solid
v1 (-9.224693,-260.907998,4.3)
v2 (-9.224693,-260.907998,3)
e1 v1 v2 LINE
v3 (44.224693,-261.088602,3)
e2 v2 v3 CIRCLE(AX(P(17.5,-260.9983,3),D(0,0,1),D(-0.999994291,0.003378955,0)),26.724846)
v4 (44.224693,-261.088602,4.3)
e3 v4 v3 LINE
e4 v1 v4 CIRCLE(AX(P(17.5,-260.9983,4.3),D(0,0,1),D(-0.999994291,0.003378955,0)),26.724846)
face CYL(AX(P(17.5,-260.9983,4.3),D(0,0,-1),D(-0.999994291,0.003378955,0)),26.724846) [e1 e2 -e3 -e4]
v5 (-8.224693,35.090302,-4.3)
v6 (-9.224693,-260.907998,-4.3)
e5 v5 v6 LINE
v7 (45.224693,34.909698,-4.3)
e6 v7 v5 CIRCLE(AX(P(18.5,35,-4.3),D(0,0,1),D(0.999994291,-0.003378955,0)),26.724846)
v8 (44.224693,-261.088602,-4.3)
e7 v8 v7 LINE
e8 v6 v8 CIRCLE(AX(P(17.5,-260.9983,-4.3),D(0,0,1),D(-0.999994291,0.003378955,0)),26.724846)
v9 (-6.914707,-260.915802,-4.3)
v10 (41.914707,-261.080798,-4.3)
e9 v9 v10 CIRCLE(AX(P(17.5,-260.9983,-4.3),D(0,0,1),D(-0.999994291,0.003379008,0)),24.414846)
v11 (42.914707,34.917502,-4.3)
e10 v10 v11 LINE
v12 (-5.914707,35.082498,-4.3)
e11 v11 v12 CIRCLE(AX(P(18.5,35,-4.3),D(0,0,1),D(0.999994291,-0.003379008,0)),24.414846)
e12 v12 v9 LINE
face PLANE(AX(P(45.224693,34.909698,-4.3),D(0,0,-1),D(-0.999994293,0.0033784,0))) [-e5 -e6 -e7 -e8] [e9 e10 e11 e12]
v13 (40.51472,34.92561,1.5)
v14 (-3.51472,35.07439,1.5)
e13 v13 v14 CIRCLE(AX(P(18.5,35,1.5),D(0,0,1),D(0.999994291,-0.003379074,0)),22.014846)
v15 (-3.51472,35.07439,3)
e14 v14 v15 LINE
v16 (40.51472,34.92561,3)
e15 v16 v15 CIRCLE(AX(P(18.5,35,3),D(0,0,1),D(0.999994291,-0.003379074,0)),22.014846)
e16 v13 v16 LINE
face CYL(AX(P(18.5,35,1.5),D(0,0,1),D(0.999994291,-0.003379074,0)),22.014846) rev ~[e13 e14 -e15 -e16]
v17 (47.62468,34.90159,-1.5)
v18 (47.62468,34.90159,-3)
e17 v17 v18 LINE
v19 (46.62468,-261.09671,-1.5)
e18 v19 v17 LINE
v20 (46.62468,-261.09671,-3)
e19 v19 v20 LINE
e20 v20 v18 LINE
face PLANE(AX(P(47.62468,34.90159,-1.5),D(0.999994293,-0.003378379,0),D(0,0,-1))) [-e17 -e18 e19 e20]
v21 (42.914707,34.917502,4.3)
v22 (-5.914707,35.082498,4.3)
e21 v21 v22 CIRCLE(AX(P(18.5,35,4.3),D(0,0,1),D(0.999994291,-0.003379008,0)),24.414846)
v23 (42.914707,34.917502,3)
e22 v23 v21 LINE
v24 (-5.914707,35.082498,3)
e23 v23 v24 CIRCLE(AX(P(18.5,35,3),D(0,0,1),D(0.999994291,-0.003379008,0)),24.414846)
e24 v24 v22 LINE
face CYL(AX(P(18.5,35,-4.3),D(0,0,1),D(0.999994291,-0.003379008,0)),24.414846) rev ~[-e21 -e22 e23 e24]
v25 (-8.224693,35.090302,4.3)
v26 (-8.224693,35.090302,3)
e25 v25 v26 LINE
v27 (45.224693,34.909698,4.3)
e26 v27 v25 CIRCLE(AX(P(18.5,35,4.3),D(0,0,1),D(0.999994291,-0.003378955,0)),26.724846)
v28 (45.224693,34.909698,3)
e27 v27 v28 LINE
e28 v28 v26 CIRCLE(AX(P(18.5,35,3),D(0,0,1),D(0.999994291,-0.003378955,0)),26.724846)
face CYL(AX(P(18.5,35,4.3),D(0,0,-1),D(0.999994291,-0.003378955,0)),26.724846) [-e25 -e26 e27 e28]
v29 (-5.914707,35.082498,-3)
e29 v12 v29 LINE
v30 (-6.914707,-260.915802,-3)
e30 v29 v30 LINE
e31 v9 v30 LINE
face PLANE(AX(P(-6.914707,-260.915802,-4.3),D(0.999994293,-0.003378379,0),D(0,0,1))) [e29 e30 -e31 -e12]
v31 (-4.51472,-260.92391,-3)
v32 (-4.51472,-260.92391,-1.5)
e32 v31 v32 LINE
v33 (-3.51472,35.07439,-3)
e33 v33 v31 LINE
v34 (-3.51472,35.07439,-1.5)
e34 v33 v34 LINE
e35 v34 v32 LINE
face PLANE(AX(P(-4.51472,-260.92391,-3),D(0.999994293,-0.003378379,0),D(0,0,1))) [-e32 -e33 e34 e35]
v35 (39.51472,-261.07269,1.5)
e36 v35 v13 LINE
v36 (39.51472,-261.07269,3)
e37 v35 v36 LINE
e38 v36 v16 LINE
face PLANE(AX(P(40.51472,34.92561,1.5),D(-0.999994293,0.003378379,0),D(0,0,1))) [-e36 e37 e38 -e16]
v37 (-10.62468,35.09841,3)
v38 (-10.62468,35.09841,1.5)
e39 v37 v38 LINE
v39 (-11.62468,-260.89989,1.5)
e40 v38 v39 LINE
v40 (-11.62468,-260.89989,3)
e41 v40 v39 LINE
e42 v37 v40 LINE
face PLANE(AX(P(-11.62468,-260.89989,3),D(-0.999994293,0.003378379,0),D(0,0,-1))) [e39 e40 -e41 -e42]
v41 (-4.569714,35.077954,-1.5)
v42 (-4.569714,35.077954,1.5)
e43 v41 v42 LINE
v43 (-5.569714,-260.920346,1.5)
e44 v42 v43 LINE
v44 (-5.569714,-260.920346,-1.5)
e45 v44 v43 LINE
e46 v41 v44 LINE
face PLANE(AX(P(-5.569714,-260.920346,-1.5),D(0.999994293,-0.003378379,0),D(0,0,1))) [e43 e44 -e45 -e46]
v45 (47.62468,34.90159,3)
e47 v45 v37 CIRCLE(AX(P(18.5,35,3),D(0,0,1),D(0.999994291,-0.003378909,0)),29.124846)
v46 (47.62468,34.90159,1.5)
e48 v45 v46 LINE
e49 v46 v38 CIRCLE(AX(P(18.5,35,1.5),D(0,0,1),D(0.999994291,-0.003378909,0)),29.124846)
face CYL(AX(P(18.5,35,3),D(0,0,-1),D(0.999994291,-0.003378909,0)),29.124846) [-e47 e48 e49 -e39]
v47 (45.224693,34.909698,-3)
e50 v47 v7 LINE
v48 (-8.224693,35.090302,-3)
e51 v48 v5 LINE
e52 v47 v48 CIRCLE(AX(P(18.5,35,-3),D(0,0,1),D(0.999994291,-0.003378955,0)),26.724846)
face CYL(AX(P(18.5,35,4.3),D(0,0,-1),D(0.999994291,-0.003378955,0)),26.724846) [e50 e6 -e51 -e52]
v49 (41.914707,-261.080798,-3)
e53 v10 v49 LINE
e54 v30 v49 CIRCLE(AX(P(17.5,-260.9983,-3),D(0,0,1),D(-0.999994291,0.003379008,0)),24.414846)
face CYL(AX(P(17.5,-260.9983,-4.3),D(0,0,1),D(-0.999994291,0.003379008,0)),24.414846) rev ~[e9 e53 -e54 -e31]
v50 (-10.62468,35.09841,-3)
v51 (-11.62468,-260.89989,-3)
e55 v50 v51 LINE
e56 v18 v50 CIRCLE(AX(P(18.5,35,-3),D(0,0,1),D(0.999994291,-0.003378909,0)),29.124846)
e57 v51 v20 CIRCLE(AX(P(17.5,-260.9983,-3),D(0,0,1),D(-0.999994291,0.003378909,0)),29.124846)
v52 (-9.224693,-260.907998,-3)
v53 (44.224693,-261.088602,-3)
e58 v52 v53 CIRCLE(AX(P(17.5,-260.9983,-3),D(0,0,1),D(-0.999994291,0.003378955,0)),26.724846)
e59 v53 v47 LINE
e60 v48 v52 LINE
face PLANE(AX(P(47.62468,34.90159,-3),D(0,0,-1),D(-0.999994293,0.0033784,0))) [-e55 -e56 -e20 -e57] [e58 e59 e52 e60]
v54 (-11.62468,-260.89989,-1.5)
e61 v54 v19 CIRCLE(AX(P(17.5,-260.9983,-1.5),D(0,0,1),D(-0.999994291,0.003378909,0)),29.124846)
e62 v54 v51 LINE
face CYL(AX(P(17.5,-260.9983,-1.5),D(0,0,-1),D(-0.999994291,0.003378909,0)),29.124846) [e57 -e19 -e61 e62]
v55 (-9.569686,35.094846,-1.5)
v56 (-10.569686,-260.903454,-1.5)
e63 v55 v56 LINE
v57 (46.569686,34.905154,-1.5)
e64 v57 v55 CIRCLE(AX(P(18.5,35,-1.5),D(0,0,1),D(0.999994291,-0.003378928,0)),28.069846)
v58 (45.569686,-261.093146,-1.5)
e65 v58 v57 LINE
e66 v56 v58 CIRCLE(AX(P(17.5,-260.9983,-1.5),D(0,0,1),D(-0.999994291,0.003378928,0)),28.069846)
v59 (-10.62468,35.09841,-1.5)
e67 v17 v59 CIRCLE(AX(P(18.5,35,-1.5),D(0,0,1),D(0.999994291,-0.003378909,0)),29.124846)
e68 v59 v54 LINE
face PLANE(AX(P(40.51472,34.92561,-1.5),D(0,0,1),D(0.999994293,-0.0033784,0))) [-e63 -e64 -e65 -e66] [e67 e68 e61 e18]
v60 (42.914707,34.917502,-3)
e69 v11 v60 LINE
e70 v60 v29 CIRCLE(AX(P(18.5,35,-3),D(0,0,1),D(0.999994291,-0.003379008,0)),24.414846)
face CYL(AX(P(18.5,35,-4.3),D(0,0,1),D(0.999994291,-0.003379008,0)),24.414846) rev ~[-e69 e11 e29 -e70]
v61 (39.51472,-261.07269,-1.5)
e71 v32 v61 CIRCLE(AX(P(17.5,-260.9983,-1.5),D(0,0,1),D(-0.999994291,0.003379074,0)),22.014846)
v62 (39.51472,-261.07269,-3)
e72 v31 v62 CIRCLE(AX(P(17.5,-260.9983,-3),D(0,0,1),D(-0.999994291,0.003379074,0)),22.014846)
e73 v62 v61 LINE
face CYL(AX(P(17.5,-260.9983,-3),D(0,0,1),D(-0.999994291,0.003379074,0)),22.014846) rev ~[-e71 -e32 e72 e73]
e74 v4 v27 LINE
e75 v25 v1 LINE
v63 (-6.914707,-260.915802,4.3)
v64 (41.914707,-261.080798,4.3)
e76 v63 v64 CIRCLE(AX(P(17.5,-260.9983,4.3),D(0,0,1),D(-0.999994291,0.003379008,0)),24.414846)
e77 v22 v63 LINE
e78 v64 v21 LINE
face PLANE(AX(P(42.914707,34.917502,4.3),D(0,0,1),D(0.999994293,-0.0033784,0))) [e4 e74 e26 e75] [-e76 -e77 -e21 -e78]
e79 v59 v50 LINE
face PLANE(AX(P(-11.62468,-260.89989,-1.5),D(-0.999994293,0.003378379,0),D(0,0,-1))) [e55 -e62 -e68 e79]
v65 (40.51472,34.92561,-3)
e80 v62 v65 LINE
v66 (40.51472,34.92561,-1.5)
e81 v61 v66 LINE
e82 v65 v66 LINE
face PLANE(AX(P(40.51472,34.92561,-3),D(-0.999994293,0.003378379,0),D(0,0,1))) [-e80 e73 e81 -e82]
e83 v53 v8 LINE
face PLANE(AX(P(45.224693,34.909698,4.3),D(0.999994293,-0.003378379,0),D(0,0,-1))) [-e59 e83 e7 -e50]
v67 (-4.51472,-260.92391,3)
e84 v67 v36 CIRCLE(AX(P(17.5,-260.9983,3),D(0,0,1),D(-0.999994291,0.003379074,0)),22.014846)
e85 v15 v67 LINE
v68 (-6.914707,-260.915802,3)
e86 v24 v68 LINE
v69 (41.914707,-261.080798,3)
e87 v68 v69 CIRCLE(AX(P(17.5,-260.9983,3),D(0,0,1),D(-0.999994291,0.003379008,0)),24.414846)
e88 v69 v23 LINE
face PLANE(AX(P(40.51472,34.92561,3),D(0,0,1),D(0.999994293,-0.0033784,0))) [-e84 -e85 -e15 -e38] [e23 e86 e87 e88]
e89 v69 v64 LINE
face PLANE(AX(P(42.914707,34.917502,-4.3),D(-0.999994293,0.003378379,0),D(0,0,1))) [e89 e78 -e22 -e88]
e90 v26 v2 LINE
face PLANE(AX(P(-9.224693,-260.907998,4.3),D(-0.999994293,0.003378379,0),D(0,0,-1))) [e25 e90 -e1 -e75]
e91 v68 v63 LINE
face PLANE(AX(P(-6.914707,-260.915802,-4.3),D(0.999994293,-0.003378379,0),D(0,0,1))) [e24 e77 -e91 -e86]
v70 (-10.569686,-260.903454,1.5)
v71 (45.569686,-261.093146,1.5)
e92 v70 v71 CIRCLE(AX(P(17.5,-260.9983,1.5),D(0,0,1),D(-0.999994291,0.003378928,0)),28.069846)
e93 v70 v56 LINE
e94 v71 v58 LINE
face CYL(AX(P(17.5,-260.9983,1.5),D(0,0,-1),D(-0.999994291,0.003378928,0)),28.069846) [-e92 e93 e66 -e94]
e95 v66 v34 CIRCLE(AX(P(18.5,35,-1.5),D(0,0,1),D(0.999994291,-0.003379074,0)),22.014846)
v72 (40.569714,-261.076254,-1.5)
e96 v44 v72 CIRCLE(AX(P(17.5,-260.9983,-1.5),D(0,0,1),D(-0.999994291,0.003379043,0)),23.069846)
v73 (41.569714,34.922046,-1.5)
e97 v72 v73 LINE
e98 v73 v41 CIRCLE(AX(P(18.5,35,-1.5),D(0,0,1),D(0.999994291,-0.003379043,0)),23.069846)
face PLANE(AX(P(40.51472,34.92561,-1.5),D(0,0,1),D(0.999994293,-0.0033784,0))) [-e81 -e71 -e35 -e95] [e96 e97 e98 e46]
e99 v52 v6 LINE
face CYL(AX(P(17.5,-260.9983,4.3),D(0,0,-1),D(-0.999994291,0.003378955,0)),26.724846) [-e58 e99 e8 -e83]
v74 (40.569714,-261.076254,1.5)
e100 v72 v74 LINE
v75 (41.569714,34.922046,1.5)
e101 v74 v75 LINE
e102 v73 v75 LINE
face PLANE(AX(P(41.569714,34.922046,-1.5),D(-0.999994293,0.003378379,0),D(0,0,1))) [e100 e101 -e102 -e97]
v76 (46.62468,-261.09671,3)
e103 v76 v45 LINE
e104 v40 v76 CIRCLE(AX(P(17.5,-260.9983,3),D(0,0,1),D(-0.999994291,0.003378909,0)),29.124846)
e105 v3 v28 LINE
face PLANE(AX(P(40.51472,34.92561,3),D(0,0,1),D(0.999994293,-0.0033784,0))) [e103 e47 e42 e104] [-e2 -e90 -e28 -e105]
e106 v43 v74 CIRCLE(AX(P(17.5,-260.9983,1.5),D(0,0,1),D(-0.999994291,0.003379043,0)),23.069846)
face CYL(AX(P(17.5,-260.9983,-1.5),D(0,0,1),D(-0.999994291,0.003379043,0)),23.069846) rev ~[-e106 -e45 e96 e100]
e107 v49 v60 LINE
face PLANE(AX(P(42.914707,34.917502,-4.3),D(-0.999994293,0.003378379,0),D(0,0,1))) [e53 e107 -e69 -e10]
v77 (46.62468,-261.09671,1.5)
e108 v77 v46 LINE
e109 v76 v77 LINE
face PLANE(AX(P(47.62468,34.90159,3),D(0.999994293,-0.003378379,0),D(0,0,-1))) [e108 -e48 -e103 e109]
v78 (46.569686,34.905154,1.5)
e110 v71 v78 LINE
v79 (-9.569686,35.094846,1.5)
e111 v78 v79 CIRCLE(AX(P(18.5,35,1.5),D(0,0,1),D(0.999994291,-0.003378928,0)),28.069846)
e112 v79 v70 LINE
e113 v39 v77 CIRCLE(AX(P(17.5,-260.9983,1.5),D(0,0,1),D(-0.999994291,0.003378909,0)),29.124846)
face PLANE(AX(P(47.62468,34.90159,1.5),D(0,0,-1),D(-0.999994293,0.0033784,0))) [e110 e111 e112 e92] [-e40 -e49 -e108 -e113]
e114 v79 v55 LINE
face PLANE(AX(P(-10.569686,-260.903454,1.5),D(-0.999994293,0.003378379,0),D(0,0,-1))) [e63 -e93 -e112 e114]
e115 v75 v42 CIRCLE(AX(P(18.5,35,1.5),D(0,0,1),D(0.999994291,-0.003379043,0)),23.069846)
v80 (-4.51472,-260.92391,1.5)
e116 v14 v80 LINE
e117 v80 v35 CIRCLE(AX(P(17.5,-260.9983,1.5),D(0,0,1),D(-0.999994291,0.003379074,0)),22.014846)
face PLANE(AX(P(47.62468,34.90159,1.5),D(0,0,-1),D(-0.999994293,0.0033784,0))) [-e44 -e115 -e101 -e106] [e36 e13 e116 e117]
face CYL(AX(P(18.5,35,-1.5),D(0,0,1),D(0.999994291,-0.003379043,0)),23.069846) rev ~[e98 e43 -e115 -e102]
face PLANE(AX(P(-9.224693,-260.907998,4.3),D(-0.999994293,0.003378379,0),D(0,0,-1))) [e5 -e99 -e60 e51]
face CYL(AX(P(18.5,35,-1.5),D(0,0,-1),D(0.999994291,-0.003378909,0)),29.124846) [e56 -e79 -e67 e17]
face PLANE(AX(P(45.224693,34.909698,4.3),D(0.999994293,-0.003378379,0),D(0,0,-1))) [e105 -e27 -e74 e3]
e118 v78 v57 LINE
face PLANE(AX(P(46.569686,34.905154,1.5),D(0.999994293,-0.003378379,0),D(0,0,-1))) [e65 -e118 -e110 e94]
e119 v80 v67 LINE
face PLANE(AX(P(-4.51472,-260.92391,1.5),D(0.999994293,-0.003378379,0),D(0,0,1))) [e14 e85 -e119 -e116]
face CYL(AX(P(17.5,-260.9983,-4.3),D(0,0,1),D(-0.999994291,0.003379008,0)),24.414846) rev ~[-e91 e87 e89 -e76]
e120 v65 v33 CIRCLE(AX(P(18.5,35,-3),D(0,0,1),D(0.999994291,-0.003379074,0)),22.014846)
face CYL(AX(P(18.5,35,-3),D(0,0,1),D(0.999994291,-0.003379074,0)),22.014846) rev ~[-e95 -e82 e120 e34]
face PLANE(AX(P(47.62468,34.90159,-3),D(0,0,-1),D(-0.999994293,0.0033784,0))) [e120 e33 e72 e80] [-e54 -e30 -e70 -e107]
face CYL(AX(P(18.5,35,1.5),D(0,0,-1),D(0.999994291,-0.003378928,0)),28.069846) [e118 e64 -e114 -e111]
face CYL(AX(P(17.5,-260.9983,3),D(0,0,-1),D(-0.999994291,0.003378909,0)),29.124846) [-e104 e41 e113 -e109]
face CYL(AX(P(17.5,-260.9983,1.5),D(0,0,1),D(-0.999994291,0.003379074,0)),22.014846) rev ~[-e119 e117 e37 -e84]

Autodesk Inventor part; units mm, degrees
ref_plane "Work Plane2" through (18.5, 35, 0) normal (-1, 0, 0) x (0, 0, 1)
ref_plane "Work Plane3" through (17.5, -260.9983, 0) normal (0.309017, 0.9510565, 0) x (0, 0, 1)
sketch "Path" plane through (0, 0, 0) normal (0, 0, 1) x (1, 0, 0)
  arc A0 (44.0697, 34.9136) -> (-7.0697, 35.0864) centre (18.5, 35) ccw
  arc A1 (-8.0697, -260.9119) -> (43.0697, -261.0847) centre (17.5, -260.9983) ccw
  line L0 (-8.0697, -260.9119) -> (-7.0697, 35.0864)
  line L1 (44.0697, 34.9136) -> (43.0697, -261.0847)
ref_plane "Section Plane" through (-7.0697, 35.0864, 0) normal (-0.0033784, -0.9999943, 0) x (0, 0, 1)
sketch "Section Sketch" plane through (-7.0697, 35.0864, 0) normal (-0.0033784, -0.9999943, 0) x (0, 0, 1)
  line L0 (-4.3, -1.155) -> (4.3, -1.155)
  line L1 (4.3, -1.155) -> (4.3, 1.155)
  line L2 (4.3, 1.155) -> (-4.3, 1.155)
  line L3 (-4.3, 1.155) -> (-4.3, -1.155)
  line L4 (-1.5, -2.5) -> (1.5, -2.5)
  line L5 (1.5, -2.5) -> (1.5, 2.5)
  line L6 (1.5, 2.5) -> (-1.5, 2.5)
  line L7 (-1.5, 2.5) -> (-1.5, -2.5)
  line L8 (-1.5, 0) -> (1.5, 0) construction
  line L9 (-3, -3.555) -> (-1.5, -3.555)
  line L10 (-1.5, -3.555) -> (-1.5, 3.555)
  line L11 (-1.5, 3.555) -> (-3, 3.555)
  line L12 (-3, 3.555) -> (-3, -3.555)
  line L13 (1.5, -3.555) -> (3, -3.555)
  line L14 (3, -3.555) -> (3, 3.555)
  line L15 (3, 3.555) -> (1.5, 3.555)
  line L16 (1.5, 3.555) -> (1.5, -3.555)
  line L17 (-4.3, 0) -> (4.3, 0) construction
  point P0 (0, 0)
  point P1 (0, 0)
  dimension "d21" = 2.31
  dimension "d22" = 5
  dimension "d23" = 3
  dimension "d24" = 1.5
  dimension "d31" = 7.11
  dimension "d32" = 8.6
sweep "Solid" add profiles "Section Sketch" path "Path"
pattern_of_one "Strand Pattern"
equation "\"d21\" = da_d2"
equation "\"d22\" = da_d1"
equation "\"d23\" = da_b1"
equation "\"d24\" = da_t1 + da_t2"
equation "\"d30\" = da_pt"
equation "\"da_p\" = 8"
equation "\"da_b1\" = 3"
equation "\"da_h2\" = 7.11"
equation "\"da_h3\" = 7.11"
equation "\"da_d1\" = 5"
equation "\"da_d2\" = 2.31"
equation "\"da_pt\" = 5.64"
equation "\"da_b\" = 8.6"
equation "\"da_t1\" = 0.75"
equation "\"da_t2\" = 0.75"
properties part number "Roller Chain"
